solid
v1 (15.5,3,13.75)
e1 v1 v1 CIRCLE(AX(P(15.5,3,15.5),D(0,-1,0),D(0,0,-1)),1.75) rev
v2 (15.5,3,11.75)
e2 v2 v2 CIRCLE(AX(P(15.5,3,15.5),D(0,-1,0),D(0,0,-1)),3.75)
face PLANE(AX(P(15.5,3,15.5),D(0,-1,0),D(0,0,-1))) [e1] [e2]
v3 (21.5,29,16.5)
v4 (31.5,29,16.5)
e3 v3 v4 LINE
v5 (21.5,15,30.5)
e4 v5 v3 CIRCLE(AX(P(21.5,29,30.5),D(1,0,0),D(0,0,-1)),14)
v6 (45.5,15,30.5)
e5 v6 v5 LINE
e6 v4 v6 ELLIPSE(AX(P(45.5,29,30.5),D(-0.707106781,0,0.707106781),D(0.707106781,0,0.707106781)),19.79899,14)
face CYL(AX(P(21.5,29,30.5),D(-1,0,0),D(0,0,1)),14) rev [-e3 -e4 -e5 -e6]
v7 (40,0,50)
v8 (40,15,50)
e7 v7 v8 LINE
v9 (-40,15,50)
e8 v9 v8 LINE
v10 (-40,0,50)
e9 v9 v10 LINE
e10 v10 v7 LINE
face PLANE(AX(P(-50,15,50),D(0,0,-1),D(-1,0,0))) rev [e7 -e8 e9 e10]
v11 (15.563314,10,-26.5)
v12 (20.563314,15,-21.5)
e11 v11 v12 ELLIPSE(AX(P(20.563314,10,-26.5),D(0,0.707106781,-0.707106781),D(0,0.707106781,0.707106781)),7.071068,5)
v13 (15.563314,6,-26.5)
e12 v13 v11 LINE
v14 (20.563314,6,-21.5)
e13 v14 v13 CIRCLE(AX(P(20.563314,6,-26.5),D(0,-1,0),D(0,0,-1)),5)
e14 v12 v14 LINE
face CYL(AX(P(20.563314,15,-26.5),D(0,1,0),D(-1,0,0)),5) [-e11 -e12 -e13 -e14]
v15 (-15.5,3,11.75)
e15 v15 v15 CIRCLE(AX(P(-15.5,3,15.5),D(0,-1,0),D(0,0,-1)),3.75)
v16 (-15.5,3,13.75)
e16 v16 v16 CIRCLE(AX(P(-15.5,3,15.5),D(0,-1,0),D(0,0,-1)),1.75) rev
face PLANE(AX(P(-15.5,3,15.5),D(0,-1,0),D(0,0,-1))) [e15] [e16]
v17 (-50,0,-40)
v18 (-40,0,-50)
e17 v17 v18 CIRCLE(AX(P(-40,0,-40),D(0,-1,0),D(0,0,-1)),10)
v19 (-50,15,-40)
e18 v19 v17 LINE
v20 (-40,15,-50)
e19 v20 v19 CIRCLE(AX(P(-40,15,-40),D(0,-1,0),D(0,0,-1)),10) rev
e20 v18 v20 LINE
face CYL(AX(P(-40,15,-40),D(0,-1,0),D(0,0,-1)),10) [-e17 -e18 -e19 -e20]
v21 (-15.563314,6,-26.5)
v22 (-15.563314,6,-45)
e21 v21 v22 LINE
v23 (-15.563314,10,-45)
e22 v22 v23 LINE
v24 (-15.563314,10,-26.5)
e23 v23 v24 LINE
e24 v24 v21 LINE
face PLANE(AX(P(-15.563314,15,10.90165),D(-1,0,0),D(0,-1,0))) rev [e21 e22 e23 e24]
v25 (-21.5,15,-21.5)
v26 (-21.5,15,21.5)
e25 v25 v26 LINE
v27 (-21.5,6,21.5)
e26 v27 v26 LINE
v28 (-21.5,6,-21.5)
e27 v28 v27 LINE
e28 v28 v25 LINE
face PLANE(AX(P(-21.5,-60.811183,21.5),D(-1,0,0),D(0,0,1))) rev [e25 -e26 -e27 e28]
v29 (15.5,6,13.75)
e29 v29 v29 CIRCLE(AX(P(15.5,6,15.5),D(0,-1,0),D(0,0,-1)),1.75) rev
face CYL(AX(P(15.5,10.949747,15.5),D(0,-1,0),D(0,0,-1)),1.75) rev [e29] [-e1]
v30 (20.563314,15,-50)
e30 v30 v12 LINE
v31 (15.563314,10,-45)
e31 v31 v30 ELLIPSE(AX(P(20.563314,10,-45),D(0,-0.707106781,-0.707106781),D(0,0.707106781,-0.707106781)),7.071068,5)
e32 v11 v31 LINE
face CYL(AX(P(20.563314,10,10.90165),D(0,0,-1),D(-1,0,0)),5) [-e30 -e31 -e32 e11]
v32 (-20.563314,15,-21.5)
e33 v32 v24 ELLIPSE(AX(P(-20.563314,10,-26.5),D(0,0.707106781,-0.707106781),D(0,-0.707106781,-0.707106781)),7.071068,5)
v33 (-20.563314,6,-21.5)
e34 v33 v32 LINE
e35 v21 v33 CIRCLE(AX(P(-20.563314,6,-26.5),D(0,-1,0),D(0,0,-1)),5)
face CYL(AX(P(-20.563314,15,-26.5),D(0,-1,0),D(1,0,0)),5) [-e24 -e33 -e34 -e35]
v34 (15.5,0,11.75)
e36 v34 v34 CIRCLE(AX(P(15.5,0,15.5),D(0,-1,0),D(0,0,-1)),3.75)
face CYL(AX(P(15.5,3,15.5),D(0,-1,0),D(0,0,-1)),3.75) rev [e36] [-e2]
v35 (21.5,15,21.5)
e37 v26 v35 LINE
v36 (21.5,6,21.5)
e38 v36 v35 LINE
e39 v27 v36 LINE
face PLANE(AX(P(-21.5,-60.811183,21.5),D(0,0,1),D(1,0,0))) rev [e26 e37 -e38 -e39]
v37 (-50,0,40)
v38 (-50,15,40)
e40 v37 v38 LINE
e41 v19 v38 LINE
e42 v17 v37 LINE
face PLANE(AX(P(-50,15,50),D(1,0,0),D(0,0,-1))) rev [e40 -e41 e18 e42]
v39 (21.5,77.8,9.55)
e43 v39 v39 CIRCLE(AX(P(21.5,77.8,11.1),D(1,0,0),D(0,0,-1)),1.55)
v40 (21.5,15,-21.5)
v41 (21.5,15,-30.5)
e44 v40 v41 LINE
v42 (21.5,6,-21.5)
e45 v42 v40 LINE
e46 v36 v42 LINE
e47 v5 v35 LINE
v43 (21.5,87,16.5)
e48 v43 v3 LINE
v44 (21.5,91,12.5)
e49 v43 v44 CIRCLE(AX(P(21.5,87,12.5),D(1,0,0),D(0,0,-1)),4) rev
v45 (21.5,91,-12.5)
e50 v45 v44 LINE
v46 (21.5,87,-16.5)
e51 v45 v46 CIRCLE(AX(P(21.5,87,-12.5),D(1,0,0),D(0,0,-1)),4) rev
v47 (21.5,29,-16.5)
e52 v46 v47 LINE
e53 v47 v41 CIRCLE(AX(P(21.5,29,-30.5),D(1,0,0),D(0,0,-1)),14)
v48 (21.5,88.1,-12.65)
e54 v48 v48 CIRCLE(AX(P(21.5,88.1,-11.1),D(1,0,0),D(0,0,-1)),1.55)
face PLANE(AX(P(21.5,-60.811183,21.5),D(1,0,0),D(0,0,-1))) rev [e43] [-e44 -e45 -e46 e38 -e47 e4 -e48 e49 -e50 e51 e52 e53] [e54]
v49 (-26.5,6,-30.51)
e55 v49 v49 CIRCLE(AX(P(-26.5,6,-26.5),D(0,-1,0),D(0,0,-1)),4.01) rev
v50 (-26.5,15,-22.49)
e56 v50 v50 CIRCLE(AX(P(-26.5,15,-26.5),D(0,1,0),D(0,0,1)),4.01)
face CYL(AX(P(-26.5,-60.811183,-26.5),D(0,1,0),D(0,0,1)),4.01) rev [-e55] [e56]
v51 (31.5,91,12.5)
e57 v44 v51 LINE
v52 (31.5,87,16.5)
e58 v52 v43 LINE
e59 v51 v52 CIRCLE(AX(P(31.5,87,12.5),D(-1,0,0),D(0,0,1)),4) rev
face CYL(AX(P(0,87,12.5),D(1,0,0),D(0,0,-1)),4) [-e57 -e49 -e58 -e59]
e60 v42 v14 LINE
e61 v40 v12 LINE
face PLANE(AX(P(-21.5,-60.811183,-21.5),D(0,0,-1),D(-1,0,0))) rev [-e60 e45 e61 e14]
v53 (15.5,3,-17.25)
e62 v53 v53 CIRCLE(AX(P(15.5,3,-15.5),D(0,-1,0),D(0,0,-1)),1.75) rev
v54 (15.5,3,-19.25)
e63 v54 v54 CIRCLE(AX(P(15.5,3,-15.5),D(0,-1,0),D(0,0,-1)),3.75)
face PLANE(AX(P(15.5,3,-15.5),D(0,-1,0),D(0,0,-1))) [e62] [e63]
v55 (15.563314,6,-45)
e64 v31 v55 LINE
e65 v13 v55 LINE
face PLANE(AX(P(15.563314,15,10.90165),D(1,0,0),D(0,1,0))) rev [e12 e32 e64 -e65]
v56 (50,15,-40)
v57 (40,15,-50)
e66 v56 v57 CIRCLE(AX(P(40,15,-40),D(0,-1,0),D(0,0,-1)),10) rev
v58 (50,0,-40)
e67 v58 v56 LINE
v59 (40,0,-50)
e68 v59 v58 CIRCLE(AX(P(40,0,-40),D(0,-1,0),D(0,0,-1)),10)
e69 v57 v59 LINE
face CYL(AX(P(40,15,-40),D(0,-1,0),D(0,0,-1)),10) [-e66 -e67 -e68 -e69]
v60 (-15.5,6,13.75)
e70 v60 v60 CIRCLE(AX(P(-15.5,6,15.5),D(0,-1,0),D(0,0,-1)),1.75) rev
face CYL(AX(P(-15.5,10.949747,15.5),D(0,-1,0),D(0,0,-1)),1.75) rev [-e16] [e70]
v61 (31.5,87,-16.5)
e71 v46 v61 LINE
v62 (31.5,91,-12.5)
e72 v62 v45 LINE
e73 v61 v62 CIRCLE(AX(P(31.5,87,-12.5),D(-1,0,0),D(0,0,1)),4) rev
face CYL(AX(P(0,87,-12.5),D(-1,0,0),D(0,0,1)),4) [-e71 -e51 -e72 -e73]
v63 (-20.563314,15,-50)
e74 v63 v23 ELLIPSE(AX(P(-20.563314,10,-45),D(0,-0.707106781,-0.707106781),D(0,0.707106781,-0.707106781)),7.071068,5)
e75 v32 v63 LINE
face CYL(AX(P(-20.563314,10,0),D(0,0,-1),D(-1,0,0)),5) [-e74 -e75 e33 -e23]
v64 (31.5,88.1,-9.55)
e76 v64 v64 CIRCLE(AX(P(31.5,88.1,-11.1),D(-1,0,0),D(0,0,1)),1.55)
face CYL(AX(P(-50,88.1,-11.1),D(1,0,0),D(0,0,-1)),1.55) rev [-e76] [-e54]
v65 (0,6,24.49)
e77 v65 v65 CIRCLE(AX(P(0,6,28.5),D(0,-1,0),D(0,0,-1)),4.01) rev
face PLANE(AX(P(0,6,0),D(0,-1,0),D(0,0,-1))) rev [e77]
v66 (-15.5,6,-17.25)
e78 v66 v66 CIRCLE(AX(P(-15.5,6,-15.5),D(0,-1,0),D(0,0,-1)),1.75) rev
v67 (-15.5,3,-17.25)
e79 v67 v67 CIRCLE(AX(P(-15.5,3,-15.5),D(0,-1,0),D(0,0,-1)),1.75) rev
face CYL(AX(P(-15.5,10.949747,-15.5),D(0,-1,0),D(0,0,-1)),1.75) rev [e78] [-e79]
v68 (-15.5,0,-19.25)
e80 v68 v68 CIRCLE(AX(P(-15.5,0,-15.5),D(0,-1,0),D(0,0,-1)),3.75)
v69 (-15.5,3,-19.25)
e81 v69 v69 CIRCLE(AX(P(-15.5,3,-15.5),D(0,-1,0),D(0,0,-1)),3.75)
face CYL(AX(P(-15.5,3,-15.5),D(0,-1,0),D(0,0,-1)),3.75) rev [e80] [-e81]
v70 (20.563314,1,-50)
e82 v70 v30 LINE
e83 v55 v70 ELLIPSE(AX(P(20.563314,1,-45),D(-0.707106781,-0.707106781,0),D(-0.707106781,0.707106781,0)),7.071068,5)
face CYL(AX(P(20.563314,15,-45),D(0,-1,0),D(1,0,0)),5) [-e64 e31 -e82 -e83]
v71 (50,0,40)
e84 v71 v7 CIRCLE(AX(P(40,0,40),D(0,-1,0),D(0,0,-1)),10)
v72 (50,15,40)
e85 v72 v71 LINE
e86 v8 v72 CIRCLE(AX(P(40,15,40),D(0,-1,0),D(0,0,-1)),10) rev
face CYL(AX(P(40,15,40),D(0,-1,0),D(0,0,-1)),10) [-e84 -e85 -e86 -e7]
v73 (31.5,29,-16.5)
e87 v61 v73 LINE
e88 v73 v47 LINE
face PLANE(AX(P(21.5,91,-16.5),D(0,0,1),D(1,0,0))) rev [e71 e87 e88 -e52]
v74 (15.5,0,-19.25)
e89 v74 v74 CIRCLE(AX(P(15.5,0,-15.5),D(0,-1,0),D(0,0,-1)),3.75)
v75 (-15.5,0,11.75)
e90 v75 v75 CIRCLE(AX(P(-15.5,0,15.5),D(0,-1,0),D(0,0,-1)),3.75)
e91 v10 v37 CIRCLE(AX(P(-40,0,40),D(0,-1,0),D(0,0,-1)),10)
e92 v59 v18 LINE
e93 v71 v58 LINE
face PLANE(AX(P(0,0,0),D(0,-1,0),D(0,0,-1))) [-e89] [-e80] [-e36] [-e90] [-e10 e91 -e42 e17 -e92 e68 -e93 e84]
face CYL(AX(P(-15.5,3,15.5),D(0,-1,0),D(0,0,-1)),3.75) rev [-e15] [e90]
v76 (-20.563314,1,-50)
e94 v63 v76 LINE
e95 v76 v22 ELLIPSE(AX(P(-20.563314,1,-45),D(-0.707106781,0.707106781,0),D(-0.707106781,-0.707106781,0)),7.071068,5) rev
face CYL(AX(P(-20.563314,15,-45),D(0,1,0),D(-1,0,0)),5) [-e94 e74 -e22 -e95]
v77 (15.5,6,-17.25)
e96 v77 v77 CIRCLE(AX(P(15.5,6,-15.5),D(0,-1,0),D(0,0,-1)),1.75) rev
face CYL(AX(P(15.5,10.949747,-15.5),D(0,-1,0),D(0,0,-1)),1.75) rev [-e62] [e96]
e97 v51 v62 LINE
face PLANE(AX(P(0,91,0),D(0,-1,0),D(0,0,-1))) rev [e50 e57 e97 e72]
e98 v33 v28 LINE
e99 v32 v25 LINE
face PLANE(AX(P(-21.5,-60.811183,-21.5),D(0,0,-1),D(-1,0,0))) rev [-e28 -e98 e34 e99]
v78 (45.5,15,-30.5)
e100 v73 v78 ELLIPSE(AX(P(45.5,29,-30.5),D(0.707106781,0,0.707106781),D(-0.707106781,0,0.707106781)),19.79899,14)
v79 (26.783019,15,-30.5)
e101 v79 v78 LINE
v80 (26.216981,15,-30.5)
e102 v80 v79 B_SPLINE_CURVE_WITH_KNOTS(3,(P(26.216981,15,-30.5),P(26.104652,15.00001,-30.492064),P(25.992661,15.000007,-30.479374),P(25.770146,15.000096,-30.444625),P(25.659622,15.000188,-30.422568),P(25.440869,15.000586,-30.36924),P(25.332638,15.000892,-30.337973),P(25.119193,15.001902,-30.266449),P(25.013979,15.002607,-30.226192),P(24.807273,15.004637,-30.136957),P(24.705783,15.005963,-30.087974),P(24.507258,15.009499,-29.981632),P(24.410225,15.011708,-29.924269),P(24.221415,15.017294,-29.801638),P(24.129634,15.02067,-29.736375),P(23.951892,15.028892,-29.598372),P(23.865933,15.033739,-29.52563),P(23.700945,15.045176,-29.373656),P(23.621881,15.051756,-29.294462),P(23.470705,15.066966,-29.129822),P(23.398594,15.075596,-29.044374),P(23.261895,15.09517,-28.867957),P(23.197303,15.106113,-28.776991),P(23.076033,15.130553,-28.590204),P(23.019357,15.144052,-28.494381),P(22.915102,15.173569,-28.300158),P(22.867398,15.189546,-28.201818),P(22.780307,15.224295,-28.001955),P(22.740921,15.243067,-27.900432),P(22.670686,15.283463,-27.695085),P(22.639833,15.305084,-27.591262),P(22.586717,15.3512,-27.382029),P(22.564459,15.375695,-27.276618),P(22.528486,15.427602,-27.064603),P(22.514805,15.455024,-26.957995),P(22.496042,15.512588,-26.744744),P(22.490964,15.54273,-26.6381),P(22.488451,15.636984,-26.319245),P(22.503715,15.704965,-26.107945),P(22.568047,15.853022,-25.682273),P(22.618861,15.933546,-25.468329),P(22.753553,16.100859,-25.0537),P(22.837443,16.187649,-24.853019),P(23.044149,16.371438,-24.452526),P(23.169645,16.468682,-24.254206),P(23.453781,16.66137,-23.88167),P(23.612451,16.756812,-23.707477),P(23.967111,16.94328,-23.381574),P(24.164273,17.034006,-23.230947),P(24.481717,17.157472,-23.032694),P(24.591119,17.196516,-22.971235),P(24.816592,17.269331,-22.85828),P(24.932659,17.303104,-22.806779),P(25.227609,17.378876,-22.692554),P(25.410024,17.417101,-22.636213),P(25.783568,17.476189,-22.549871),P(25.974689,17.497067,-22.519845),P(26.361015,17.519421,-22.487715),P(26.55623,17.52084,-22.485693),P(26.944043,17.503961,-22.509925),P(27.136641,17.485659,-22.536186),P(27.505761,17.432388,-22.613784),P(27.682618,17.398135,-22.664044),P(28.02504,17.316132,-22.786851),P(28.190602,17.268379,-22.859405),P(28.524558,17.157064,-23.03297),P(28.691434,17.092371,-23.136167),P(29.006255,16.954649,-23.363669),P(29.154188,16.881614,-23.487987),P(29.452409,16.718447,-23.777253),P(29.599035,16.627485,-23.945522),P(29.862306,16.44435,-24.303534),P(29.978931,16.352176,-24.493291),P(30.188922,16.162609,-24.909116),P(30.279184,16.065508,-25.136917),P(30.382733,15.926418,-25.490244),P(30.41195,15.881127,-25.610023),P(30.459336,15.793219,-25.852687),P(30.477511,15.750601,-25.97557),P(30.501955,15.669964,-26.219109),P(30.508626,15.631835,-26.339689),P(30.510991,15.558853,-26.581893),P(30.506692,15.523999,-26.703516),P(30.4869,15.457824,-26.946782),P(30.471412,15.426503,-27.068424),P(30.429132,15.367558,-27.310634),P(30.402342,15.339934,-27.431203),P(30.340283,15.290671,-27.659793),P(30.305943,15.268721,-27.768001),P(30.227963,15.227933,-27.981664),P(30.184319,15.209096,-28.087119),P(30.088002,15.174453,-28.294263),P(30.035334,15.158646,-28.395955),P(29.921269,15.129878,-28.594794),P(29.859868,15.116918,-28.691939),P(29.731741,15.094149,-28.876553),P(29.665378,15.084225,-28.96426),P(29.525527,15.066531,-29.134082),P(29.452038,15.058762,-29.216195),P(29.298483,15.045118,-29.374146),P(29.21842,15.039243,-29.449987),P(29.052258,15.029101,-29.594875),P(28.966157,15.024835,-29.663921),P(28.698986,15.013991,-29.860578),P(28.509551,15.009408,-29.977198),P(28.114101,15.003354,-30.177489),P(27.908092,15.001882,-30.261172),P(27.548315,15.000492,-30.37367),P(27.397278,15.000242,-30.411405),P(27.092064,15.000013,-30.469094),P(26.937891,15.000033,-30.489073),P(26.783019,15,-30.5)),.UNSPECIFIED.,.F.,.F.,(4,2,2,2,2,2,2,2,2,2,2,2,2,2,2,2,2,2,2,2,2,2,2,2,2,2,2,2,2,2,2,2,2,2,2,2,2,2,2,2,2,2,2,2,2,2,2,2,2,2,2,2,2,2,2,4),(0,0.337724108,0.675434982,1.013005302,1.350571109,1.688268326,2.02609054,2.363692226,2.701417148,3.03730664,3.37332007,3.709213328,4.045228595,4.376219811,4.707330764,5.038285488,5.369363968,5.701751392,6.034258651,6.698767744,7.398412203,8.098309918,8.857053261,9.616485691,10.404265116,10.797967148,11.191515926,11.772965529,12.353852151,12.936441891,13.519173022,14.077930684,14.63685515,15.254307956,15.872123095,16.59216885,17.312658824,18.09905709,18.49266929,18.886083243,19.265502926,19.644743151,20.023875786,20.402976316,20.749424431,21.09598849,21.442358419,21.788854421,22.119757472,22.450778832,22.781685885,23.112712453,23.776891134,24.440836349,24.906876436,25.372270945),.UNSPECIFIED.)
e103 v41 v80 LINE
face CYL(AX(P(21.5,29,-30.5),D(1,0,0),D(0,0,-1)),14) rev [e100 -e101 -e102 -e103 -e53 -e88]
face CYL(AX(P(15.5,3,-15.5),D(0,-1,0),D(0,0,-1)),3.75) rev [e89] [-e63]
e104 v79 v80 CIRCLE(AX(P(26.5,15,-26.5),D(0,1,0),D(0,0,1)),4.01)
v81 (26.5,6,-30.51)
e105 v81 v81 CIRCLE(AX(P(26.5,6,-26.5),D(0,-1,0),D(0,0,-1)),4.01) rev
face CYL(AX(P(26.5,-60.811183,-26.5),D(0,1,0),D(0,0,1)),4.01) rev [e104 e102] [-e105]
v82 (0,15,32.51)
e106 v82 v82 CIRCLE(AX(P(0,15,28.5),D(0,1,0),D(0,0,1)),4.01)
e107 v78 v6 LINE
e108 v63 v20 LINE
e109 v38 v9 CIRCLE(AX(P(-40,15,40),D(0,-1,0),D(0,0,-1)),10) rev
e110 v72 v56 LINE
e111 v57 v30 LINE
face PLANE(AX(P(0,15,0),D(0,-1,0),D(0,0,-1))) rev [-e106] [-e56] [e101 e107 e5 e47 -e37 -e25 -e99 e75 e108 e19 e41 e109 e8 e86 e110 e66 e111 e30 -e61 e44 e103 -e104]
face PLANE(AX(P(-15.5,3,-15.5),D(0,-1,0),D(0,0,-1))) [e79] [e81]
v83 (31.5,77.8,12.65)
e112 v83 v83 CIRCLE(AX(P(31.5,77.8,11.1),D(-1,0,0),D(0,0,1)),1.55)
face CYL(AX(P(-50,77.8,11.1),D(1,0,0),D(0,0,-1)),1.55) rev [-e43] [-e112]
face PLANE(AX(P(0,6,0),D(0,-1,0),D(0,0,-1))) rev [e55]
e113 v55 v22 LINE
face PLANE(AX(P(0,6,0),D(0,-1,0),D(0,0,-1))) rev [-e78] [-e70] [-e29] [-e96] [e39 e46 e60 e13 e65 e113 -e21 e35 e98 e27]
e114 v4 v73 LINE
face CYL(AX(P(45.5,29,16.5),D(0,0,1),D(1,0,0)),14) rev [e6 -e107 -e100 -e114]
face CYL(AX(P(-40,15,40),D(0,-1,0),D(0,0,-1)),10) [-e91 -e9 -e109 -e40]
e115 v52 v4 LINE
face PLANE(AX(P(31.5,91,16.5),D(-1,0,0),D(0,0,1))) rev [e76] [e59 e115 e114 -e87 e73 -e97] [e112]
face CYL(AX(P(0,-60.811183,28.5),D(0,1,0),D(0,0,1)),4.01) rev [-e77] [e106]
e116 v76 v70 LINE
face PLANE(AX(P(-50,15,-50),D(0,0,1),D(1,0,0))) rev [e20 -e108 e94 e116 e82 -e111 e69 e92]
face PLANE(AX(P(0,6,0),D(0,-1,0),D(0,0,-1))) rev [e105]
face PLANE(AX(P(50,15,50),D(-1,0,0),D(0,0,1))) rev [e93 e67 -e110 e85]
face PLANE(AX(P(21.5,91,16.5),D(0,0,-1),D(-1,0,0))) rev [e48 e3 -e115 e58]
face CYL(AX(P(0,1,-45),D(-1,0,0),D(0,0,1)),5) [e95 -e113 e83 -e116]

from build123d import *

# Parameters (mm, degrees)
SKETCH1_W               = 100
SKETCH1_H               = 100
BOSS_EXTRUDE1_DEPTH     = 15
SKETCH2_R               = 4.01
SKETCH2_W               = 43
SKETCH2_H               = 43
CUT_EXTRUDE1_DEPTH      = 9
SKETCH3_W               = 31.126627524
SKETCH3_H               = 9
CUT_EXTRUDE2_DEPTH      = 28.5
SKETCH4_R               = 1.75
CUT_EXTRUDE3_DEPTH      = 6
SKETCH5_R               = 3.75
CUT_EXTRUDE4_DEPTH      = 3
FILLET1_R               = 10
FILLET2_R               = 5
SKETCH6_W               = 10
SKETCH6_H               = 33
BOSS_EXTRUDE2_DEPTH     = 76
CUT_EXTRUDE5_DEPTH      = 132.99715906
CUT_EXTRUDE5_DEPTH_BACK = 132.99715906
SKETCH7_R               = 1.55
FILLET3_R               = 4
FILLET4_START           = 21.5
FILLET4_DEPTH           = 24
FILLET4_START_2         = -16.5
FILLET4_2_DEPTH         = 33
FILLET4_START_3         = -30.5
FILLET4_3_DEPTH         = 80.5
FILLET4_START_4         = 15
FILLET4_4_OUTLINE_R     = 4.01
FILLET4_4_DEPTH         = 14


with BuildPart() as part:
    # Sketch1 → Boss-Extrude1 (new body)
    with BuildSketch(Plane(origin=(0, 0, 0), x_dir=(1, 0, 0), z_dir=(0, 1, 0))):
        Rectangle(SKETCH1_W, SKETCH1_H)
    extrude(amount=BOSS_EXTRUDE1_DEPTH)

    # Sketch2 → Cut-Extrude1 (cut)
    with BuildSketch(Plane(origin=(0, 15, 0), x_dir=(1, 0, 0), z_dir=(0, 1, 0))):
        with Locations(Location((-26.5, 26.5, 0), (0, 0, 270))):
            Circle(SKETCH2_R)
        with Locations(Location((0, -28.5, 0), (0, 0, 270))):
            Circle(SKETCH2_R)
        with Locations(Location((26.5, 26.5, 0), (0, 0, 270))):
            Circle(SKETCH2_R)
        Rectangle(SKETCH2_W, SKETCH2_H)
    extrude(amount=-CUT_EXTRUDE1_DEPTH, mode=Mode.SUBTRACT)

    # Sketch3 → Cut-Extrude2 (cut)
    with BuildSketch(Plane(origin=(0, 0, -50), x_dir=(-1, 0, 0), z_dir=(0, 0, -1))):
        with Locations((0, 10.5)):
            Rectangle(SKETCH3_W, SKETCH3_H)
    extrude(amount=-CUT_EXTRUDE2_DEPTH, mode=Mode.SUBTRACT)

    # Sketch4 → Cut-Extrude3 (cut)
    with BuildSketch(Plane.XZ):
        with Locations(Location((-15.5, 15.5, 0), (0, 0, 270))):
            Circle(SKETCH4_R)
        with Locations(Location((15.5, 15.5, 0), (0, 0, 270))):
            Circle(SKETCH4_R)
        with Locations(Location((15.5, -15.5, 0), (0, 0, 270))):
            Circle(SKETCH4_R)
        with Locations(Location((-15.5, -15.5, 0), (0, 0, 270))):
            Circle(SKETCH4_R)
    extrude(amount=-CUT_EXTRUDE3_DEPTH, mode=Mode.SUBTRACT)

    # Sketch5 → Cut-Extrude4 (cut)
    with BuildSketch(Plane.XZ):
        with Locations(Location((-15.5, 15.5, 0), (0, 0, 270))):
            Circle(SKETCH5_R)
        with Locations(Location((15.5, 15.5, 0), (0, 0, 270))):
            Circle(SKETCH5_R)
        with Locations(Location((-15.5, -15.5, 0), (0, 0, 270))):
            Circle(SKETCH5_R)
        with Locations(Location((15.5, -15.5, 0), (0, 0, 270))):
            Circle(SKETCH5_R)
    extrude(amount=-CUT_EXTRUDE4_DEPTH, mode=Mode.SUBTRACT)

    # Fillet1
    fillet1_edges = [part.edges().sort_by_distance(p)[0] for p in [
        (50, 7.5, 50),
        (-50, 7.5, 50),
        (-50, 7.5, -50),
        (50, 7.5, -50),
    ]]
    fillet(fillet1_edges, radius=FILLET1_R)

    # Fillet2
    fillet2_edges = [part.edges().sort_by_distance(p)[0] for p in [
        (15.563313762, 15, -35.75),
        (-15.563313762, 15, -35.75),
        (15.563313762, 10.5, -50),
        (0, 6, -50),
        (-15.563313762, 10.5, -50),
        (15.563313762, 10.5, -21.5),
        (-15.563313762, 10.5, -21.5),
    ]]
    fillet(fillet2_edges, radius=FILLET2_R)

    # Sketch6 → Boss-Extrude2 (add)
    with BuildSketch(Plane(origin=(0, 15, 0), x_dir=(1, 0, 0), z_dir=(0, 1, 0))):
        with Locations((26.5, 0)):
            Rectangle(SKETCH6_W, SKETCH6_H)
    extrude(amount=BOSS_EXTRUDE2_DEPTH)

    # Sketch7 → Cut-Extrude5 (cut, two sides: drawn at the far end of the back side and taken through both)
    with BuildSketch(Plane(origin=(31.5, 0, 0), x_dir=(0, 0, -1), z_dir=(1, 0, 0)).offset(-CUT_EXTRUDE5_DEPTH_BACK)):
        with Locations((11.1, 88.1)):
            Circle(SKETCH7_R)
        with Locations((-11.1, 77.8)):
            Circle(SKETCH7_R)
    extrude(amount=CUT_EXTRUDE5_DEPTH + CUT_EXTRUDE5_DEPTH_BACK, mode=Mode.SUBTRACT)

    # Fillet3
    fillet3_edges = [part.edges().sort_by_distance(p)[0] for p in [
        (26.5, 91, 16.5),
        (26.5, 91, -16.5),
    ]]
    fillet(fillet3_edges, radius=FILLET3_R)

    # Fillet4: read off the stored shape, not the designer's step
    # Fillet4 outline → Fillet4 (add)
    with BuildSketch(Plane.YZ.offset(FILLET4_START)):
        with BuildLine():
            Line((15, 16.5), (29, 16.5))
            ThreePointArc((29, 16.5), (19.100505063, 20.600505063), (15, 30.5))
            Line((15, 30.5), (15, 16.5))
        make_face()
        with BuildLine():
            Line((29, -16.5), (15, -16.5))
            Line((15, -16.5), (15, -30.5))
            ThreePointArc((15, -30.5), (19.100505063, -20.600505063), (29, -16.5))
        make_face()
    extrude(amount=FILLET4_DEPTH)

    # Fillet4 2 outline → Fillet4 2 (add)
    with BuildSketch(Plane.XY.offset(FILLET4_START_2)):
        with BuildLine():
            ThreePointArc((45.5, 15), (35.600505063, 19.100505063), (31.5, 29))
            Line((31.5, 29), (31.5, 15))
            Line((31.5, 15), (45.5, 15))
        make_face()
    extrude(amount=FILLET4_2_DEPTH)

    # Fillet4 3 outline → Fillet4 3 (cut)
    with BuildSketch(Plane.XY.offset(FILLET4_START_3)):
        with BuildLine():
            Line((31.5, 30), (31.5, 29))
            ThreePointArc((31.5, 29), (35.600505063, 19.100505063), (45.5, 15))
            Line((45.5, 15), (47, 15))
            Line((47, 15), (47, 30))
            Line((47, 30), (31.5, 30))
        make_face()
    extrude(amount=FILLET4_3_DEPTH, mode=Mode.SUBTRACT)

    # Fillet4 4 outline → Fillet4 4 (cut)
    with BuildSketch(Plane(origin=(0, 0, 0), x_dir=(1, 0, 0), z_dir=(0, 1, 0)).offset(FILLET4_START_4)):
        with Locations((26.5, 26.5)):
            Circle(FILLET4_4_OUTLINE_R)
    extrude(amount=FILLET4_4_DEPTH, mode=Mode.SUBTRACT)


solid = part.part
